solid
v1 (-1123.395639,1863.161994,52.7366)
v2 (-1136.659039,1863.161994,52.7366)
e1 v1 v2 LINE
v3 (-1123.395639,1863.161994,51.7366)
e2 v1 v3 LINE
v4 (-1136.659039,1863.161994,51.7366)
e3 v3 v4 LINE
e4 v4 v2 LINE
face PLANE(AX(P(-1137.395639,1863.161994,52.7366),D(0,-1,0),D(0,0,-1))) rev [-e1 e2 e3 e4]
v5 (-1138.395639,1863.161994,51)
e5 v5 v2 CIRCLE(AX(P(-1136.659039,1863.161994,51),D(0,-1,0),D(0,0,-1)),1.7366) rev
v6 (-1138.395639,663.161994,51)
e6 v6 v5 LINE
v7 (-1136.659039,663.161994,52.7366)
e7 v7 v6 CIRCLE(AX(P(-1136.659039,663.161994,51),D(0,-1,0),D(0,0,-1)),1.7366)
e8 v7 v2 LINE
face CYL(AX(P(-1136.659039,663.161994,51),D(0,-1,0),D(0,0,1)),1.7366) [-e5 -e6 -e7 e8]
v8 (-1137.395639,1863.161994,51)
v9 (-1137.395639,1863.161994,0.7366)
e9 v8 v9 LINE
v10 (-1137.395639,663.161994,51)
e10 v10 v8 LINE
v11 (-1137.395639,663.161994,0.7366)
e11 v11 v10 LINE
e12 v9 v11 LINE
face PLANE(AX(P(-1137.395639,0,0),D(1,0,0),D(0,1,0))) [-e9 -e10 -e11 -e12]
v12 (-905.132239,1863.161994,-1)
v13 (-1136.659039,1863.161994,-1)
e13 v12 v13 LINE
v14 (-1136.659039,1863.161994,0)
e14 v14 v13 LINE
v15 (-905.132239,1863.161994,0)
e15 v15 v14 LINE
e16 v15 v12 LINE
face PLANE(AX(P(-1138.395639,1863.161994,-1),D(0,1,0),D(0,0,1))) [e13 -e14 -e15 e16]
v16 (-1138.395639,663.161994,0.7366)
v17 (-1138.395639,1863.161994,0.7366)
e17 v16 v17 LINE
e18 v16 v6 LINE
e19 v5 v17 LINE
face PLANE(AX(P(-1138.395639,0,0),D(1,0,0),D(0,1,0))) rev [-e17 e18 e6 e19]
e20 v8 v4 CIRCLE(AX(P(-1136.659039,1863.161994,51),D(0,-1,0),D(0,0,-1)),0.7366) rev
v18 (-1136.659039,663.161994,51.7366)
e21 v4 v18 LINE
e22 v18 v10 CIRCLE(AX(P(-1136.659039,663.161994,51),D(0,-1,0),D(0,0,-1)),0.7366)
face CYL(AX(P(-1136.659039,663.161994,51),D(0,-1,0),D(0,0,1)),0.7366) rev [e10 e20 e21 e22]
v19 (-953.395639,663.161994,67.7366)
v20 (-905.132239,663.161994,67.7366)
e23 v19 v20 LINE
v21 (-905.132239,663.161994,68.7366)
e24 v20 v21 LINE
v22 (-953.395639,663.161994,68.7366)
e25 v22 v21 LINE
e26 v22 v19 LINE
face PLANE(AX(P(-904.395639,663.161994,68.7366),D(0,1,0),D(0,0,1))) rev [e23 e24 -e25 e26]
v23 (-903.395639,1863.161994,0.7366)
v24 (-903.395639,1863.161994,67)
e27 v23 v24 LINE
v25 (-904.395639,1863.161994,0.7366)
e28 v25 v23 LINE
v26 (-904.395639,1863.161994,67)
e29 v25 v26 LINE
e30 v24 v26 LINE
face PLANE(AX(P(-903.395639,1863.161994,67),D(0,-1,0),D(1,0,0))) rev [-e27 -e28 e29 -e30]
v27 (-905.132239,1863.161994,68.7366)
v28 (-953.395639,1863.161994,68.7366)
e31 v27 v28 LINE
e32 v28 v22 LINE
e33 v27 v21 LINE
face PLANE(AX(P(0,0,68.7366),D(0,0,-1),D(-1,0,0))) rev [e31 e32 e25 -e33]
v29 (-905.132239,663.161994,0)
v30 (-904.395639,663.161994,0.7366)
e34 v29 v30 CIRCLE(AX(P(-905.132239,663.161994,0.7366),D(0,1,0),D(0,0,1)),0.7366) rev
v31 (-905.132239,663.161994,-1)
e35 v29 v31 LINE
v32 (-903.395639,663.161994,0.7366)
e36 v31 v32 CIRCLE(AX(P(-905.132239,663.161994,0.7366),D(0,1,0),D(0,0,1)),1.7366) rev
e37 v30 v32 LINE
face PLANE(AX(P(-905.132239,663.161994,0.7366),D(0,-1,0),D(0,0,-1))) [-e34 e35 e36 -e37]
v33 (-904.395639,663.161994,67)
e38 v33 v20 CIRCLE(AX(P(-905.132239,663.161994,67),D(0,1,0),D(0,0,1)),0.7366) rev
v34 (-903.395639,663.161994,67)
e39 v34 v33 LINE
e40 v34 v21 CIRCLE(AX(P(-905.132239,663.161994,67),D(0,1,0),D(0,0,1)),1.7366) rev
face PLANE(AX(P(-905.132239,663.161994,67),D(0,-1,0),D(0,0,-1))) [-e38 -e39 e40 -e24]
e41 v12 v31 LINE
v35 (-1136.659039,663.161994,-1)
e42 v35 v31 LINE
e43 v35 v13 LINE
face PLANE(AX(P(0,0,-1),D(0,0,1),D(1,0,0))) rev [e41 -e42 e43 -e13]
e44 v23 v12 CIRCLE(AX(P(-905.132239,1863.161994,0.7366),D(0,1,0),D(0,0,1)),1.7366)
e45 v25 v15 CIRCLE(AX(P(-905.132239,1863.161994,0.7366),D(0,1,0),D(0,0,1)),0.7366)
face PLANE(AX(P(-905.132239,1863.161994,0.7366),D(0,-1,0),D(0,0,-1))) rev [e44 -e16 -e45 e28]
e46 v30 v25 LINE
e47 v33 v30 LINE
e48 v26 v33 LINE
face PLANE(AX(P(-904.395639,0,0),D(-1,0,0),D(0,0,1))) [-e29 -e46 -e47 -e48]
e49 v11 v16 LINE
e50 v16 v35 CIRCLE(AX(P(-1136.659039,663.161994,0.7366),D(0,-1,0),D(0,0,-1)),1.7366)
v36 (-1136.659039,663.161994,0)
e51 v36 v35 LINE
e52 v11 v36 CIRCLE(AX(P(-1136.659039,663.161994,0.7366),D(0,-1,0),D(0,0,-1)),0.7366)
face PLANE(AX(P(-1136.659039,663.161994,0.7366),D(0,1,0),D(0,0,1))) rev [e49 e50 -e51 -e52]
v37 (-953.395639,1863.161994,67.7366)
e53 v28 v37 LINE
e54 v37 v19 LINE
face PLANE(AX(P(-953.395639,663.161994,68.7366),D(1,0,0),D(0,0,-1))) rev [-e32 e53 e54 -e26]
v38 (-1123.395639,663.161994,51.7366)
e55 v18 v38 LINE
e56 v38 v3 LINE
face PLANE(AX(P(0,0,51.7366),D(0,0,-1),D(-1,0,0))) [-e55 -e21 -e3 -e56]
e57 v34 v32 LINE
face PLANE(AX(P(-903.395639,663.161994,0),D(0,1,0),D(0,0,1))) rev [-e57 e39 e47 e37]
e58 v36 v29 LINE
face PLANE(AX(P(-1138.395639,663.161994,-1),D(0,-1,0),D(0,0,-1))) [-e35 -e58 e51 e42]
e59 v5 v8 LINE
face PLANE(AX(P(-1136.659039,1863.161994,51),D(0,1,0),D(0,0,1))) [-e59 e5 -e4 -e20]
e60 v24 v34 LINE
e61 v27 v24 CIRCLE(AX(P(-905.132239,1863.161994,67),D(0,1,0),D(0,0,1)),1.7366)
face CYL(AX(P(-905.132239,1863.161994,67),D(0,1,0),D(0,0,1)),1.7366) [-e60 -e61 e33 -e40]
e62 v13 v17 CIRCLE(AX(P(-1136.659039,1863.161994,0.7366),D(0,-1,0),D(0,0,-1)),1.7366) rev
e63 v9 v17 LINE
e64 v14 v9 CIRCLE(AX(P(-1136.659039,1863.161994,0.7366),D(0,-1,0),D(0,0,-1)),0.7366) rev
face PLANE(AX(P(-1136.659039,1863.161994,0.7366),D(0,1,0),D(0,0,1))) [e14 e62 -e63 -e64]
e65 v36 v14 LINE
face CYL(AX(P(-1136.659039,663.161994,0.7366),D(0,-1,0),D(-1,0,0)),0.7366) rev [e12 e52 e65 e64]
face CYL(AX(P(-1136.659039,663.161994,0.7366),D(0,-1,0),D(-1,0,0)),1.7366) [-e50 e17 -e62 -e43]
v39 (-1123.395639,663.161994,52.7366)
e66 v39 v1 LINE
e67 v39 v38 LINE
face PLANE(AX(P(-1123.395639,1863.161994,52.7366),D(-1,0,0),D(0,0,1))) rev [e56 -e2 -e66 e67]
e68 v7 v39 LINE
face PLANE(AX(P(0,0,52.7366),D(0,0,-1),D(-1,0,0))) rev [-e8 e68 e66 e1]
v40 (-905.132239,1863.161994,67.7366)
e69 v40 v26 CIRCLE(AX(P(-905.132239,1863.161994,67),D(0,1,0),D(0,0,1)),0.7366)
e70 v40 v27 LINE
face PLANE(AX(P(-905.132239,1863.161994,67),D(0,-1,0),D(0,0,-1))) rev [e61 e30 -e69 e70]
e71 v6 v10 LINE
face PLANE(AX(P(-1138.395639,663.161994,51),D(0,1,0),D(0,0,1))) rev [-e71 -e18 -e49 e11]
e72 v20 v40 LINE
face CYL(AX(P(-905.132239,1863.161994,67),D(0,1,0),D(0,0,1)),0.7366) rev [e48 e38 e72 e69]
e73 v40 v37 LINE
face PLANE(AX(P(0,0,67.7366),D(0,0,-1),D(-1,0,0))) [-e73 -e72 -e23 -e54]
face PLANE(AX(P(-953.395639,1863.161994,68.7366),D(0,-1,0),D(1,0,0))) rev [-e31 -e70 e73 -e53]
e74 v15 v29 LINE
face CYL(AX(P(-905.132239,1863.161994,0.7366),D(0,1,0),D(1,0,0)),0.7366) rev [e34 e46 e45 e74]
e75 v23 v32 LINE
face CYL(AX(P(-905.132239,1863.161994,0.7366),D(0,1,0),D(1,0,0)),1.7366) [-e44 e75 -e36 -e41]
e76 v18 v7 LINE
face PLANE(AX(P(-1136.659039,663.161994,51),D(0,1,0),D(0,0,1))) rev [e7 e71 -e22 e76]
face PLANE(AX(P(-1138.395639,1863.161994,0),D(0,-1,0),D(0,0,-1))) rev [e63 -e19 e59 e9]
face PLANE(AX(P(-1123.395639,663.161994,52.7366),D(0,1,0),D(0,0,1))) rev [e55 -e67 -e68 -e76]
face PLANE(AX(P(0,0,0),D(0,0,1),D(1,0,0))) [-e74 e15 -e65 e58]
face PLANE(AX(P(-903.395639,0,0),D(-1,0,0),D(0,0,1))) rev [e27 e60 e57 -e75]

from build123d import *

# Parameters (mm, degrees)
SKETCH1_W                    = 235
SKETCH1_H                    = 1200
BASE_FLANGE1_DEPTH           = 1
EDGE_FLANGE2_STRIP_W         = 5.4732
EDGE_FLANGE2_STRIP_H         = 1
EDGE_FLANGE2_STRIP_CUT_DEPTH = 1200
EDGE_FLANGE2_DEPTH           = 1200
EDGE_FLANGE3_DEPTH           = 1200
EDGE_FLANGE4_STRIP_W         = 5.4732
EDGE_FLANGE4_STRIP_H         = 1
EDGE_FLANGE4_STRIP_CUT_DEPTH = 1200
EDGE_FLANGE4_DEPTH           = 1200
EDGE_FLANGE5_DEPTH           = 1200


# Sheet-metal steps are written as plain solids
with BuildPart() as part:
    # Sketch1 → Base-Flange1 (new body)
    with BuildSketch(Plane.XY):
        with Locations((-1020.895638629, 1263.161993769)):
            Rectangle(SKETCH1_W, SKETCH1_H)
    extrude(amount=-BASE_FLANGE1_DEPTH)

    # Edge-Flange2 strip (across the edge) → Edge-Flange2 strip cut (cut)
    with BuildSketch(Plane(origin=(-1138.395638629, 1863.161993769, 0), x_dir=(1, 0, 0), z_dir=(0, -1, 0))):
        with Locations((-1, -0.5)):
            Rectangle(EDGE_FLANGE2_STRIP_W, EDGE_FLANGE2_STRIP_H)
    extrude(amount=EDGE_FLANGE2_STRIP_CUT_DEPTH, mode=Mode.SUBTRACT)

    # Edge-Flange2 section (across the edge) → Edge-Flange2 (add)
    with BuildSketch(Plane(origin=(-1138.395638629, 1863.161993769, 0), x_dir=(1, 0, 0), z_dir=(0, -1, 0))):
        with BuildLine():
            Line((0, 0.7366), (0, 51))
            Line((0, 51), (1, 51))
            Line((1, 51), (1, 0.7366))
            ThreePointArc((1, 0.7366), (1.215745145, 0.215745145), (1.7366, 0))
            Line((1.7366, 0), (1.7366, -1))
            ThreePointArc((1.7366, -1), (0.508638364, -0.491361636), (0, 0.7366))
        make_face()
    extrude(amount=EDGE_FLANGE2_DEPTH)

    # Edge-Flange3 section (across the edge) → Edge-Flange3 (add)
    with BuildSketch(Plane(origin=(-1137.395638629, 1863.161993769, 51.7366), x_dir=(0, 0, -1), z_dir=(0, -1, 0))):
        with BuildLine():
            Line((-1, 0.7366), (-1, 14))
            Line((-1, 14), (0, 14))
            Line((0, 14), (0, 0.7366))
            ThreePointArc((0, 0.7366), (0.215745145, 0.215745145), (0.7366, 0))
            Line((0.7366, 0), (0.7366, -1))
            ThreePointArc((0.7366, -1), (-0.491361636, -0.491361636), (-1, 0.7366))
        make_face()
    extrude(amount=EDGE_FLANGE3_DEPTH)

    # Edge-Flange4 strip (across the edge) → Edge-Flange4 strip cut (cut)
    with BuildSketch(Plane(origin=(-903.395638629, 663.161993769, 0), x_dir=(-1, 0, 0), z_dir=(0, 1, 0))):
        with Locations((-1, -0.5)):
            Rectangle(EDGE_FLANGE4_STRIP_W, EDGE_FLANGE4_STRIP_H)
    extrude(amount=EDGE_FLANGE4_STRIP_CUT_DEPTH, mode=Mode.SUBTRACT)

    # Edge-Flange4 section (across the edge) → Edge-Flange4 (add)
    with BuildSketch(Plane(origin=(-903.395638629, 663.161993769, 0), x_dir=(-1, 0, 0), z_dir=(0, 1, 0))):
        with BuildLine():
            Line((0, 0.7366), (0, 67))
            Line((0, 67), (1, 67))
            Line((1, 67), (1, 0.7366))
            ThreePointArc((1, 0.7366), (1.215745145, 0.215745145), (1.7366, 0))
            Line((1.7366, 0), (1.7366, -1))
            ThreePointArc((1.7366, -1), (0.508638364, -0.491361636), (0, 0.7366))
        make_face()
    extrude(amount=EDGE_FLANGE4_DEPTH)

    # Edge-Flange5 section (across the edge) → Edge-Flange5 (add)
    with BuildSketch(Plane(origin=(-904.395638629, 663.161993769, 67.7366), x_dir=(0, 0, -1), z_dir=(0, 1, 0))):
        with BuildLine():
            Line((-1, 0.7366), (-1, 49))
            Line((-1, 49), (0, 49))
            Line((0, 49), (0, 0.7366))
            ThreePointArc((0, 0.7366), (0.215745145, 0.215745145), (0.7366, 0))
            Line((0.7366, 0), (0.7366, -1))
            ThreePointArc((0.7366, -1), (-0.491361636, -0.491361636), (-1, 0.7366))
        make_face()
    extrude(amount=EDGE_FLANGE5_DEPTH)


solid = part.part
